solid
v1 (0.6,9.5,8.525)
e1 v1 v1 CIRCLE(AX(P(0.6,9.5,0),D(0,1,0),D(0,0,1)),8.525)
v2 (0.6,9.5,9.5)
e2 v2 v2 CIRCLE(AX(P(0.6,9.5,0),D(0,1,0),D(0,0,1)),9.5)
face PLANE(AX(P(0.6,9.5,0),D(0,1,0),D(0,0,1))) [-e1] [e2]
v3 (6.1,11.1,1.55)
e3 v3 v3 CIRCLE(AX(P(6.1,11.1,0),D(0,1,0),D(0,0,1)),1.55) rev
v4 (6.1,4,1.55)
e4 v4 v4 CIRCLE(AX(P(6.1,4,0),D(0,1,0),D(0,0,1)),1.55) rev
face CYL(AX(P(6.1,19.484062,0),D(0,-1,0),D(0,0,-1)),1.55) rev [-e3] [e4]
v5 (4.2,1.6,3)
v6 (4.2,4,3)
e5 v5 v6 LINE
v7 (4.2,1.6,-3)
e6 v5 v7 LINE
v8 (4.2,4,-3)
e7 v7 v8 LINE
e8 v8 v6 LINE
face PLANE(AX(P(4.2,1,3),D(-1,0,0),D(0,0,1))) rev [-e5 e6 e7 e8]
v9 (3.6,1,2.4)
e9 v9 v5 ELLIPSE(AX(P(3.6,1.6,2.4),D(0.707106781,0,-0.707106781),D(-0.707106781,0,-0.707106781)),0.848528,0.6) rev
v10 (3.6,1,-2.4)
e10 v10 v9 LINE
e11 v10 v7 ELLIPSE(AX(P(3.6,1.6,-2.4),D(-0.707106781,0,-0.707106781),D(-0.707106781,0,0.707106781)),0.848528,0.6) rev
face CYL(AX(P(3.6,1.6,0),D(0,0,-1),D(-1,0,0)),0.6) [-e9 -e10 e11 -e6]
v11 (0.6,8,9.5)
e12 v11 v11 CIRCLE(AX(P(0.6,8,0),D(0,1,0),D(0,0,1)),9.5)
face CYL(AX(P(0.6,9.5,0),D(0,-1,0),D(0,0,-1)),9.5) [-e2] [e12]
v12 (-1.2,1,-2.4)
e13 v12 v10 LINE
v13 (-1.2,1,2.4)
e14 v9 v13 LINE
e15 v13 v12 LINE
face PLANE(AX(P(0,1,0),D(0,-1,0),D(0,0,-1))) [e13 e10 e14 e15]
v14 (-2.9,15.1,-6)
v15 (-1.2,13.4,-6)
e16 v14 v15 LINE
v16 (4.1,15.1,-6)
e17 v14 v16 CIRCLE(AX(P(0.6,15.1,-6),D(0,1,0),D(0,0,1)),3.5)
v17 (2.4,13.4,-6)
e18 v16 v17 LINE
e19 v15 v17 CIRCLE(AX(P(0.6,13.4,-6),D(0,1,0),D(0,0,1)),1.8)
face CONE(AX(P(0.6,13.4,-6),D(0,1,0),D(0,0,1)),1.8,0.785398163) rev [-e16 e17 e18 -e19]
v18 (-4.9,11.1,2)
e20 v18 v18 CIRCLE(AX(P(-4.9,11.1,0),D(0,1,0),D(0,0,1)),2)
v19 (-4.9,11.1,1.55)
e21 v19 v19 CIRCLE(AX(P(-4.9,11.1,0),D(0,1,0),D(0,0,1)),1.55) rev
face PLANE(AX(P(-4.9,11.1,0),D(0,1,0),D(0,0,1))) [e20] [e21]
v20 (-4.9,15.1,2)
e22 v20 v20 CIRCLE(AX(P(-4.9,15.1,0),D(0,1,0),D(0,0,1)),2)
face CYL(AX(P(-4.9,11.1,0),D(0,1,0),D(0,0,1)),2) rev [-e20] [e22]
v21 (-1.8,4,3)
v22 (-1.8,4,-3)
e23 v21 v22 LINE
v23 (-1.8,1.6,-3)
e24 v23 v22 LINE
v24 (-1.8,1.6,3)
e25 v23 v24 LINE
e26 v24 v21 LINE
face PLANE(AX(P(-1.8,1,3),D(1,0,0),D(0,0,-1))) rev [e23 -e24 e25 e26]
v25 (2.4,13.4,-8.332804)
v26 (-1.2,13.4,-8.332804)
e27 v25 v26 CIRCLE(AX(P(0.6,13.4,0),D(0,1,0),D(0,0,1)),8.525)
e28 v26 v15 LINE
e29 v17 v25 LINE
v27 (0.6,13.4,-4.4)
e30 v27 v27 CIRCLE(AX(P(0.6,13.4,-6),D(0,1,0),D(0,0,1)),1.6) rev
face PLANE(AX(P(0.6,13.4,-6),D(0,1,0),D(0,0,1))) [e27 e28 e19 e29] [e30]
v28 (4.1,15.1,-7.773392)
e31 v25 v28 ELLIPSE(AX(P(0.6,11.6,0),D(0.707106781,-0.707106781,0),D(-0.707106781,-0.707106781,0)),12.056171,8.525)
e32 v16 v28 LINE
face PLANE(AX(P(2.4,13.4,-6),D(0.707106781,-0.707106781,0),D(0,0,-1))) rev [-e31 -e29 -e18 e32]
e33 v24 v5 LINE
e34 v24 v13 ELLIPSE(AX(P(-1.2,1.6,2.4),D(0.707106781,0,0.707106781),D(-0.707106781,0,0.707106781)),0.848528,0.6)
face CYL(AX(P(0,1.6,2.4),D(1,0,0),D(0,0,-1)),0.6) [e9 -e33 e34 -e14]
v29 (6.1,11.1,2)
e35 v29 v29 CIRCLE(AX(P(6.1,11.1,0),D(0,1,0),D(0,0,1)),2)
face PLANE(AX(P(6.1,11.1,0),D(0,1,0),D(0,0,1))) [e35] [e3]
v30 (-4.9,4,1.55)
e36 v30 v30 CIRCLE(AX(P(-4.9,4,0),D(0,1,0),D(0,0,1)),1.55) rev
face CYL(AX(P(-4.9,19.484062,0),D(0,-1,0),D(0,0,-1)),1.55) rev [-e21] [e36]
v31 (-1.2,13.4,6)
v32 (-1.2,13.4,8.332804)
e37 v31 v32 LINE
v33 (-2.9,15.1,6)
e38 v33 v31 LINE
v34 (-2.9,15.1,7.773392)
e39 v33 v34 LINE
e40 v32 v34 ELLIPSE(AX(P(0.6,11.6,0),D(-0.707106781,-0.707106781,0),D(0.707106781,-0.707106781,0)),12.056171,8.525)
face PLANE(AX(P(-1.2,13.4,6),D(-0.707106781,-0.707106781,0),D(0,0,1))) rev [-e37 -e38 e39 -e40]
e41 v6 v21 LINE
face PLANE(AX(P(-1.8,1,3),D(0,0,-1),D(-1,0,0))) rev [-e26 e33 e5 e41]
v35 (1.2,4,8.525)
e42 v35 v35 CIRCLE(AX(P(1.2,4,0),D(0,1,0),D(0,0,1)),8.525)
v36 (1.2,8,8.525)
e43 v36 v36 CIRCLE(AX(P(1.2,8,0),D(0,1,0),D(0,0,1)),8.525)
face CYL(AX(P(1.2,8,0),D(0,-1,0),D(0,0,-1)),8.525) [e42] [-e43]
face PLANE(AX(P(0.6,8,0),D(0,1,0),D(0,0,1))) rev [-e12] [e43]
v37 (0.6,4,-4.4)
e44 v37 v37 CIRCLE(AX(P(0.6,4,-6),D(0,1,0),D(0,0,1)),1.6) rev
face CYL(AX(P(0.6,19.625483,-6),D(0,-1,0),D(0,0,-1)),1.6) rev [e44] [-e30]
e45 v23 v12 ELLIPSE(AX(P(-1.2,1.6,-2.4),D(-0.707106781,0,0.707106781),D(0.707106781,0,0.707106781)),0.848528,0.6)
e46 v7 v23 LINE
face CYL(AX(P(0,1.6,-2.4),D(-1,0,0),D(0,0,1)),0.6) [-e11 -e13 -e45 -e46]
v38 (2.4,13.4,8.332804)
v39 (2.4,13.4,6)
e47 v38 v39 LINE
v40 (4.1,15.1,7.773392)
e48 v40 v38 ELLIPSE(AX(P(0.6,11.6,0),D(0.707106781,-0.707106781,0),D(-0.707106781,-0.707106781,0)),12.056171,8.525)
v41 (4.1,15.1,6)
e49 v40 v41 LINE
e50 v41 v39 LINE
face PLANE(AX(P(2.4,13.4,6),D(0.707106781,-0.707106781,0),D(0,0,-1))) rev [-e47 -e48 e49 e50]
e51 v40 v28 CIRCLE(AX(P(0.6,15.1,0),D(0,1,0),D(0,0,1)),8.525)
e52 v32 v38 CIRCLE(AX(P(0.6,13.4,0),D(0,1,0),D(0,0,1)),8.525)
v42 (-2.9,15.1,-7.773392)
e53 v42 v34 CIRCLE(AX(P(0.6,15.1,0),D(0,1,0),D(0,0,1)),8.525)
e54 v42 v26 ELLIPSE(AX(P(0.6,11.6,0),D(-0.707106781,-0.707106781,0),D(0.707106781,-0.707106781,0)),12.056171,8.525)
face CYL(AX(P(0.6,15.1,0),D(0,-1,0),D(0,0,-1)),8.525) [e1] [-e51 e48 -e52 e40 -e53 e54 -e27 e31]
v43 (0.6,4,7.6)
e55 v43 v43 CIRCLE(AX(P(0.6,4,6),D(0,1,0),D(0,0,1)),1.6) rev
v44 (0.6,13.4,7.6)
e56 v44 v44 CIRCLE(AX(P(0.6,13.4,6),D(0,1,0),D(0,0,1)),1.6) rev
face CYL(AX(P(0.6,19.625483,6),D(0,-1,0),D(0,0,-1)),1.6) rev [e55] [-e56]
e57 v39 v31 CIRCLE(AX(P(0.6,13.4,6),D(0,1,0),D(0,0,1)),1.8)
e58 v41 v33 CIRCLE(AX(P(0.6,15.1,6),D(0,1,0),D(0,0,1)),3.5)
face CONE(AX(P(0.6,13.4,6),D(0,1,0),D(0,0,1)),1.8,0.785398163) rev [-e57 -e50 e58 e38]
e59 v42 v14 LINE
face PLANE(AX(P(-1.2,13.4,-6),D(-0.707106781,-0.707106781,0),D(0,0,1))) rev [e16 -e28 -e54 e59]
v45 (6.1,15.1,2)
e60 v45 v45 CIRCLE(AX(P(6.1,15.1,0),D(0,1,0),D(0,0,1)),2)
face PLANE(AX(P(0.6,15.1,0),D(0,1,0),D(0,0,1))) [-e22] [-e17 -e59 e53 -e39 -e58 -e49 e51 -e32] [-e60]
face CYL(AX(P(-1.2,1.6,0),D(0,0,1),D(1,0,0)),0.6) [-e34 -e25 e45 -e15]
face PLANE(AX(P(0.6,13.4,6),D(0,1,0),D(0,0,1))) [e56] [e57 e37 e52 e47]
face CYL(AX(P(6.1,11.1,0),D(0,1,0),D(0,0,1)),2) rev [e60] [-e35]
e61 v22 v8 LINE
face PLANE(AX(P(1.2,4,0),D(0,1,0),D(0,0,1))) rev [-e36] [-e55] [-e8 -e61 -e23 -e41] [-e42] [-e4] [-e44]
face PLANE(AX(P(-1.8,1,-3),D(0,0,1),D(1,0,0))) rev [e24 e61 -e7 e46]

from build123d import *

# Parameters (mm, degrees)
SKETCH1_R            = 8.525
BOSS_EXTRUDE11_DEPTH = 4
SKETCH20_R           = 8.525
BOSS_EXTRUDE12_DEPTH = 4
SKETCH21_R           = 9.5
BOSS_EXTRUDE13_DEPTH = 1.5
SKETCH22_R           = 8.525
BOSS_EXTRUDE14_DEPTH = 5.6
BOSS_EXTRUDE15_START = 14.75
SKETCH30_R           = 8.525
BOSS_EXTRUDE15_DEPTH = 14.75
SKETCH33_R           = 2.1
CUT_EXTRUDE14_DEPTH  = 5.8
BOSS_EXTRUDE16_START = 1.25
SKETCH35_R           = 9.5
BOSS_EXTRUDE16_DEPTH = 1.25
SKETCH36_R           = 1.6
CUT_EXTRUDE15_DEPTH  = 29.85
CIRPATTERN1_COUNT    = 2
SKETCH43_R           = 1.55
CUT_EXTRUDE20_DEPTH  = 29.85
SKETCH44_R           = 2
CUT_EXTRUDE21_DEPTH  = 4
CUT_EXTRUDE22_DEPTH  = 1.7
CUT_EXTRUDE23_DEPTH  = 3
SKETCH47_W           = 28.870202412
SKETCH47_H           = 25.831233738
CUT_EXTRUDE24_DEPTH  = 18.75
SKETCH48_W           = 6
SKETCH48_H           = 6
BOSS_EXTRUDE17_DEPTH = 3
FILLET1_R            = 0.6
CHAMFER1_SIZE        = 1.7


with BuildPart() as part:
    # Sketch1 → Boss-Extrude11 (new body)
    with BuildSketch(Plane(origin=(0, 0, 0), x_dir=(1, 0, 0), z_dir=(0, 1, 0))):
        with Locations(Location((0, 0, 0), (0, 0, 270))):
            Circle(SKETCH1_R)
    extrude(amount=BOSS_EXTRUDE11_DEPTH)

    # Sketch20 → Boss-Extrude12 (add)
    with BuildSketch(Plane(origin=(0, 4, 0), x_dir=(1, 0, 0), z_dir=(0, 1, 0))):
        with Locations(Location((1.2, 0, 0), (0, 0, 94.035884191))):
            Circle(SKETCH20_R)
    extrude(amount=BOSS_EXTRUDE12_DEPTH)

    # Sketch21 → Boss-Extrude13 (add)
    with BuildSketch(Plane(origin=(0, 8, 0), x_dir=(1, 0, 0), z_dir=(0, 1, 0))):
        with Locations(Location((0.6, 0, 0), (0, 0, 270))):
            Circle(SKETCH21_R)
    extrude(amount=BOSS_EXTRUDE13_DEPTH)

    # Sketch22 → Boss-Extrude14 (add)
    with BuildSketch(Plane(origin=(0, 9.5, 0), x_dir=(1, 0, 0), z_dir=(0, 1, 0))):
        with Locations(Location((0.6, 0, 0), (0, 0, 270))):
            Circle(SKETCH22_R)
    extrude(amount=BOSS_EXTRUDE14_DEPTH)

    # Sketch30 → Boss-Extrude15 (add)
    with BuildSketch(Plane.XZ.offset(BOSS_EXTRUDE15_START)):
        with Locations(Location((0.6, 0, 0), (0, 0, 90))):
            Circle(SKETCH30_R)
    extrude(amount=-BOSS_EXTRUDE15_DEPTH)

    # Sketch33 → Cut-Extrude14 (cut)
    with BuildSketch(Plane.XZ.offset(14.75)):
        with Locations(Location((0.6, 0, 0), (0, 0, 270))):
            Circle(SKETCH33_R)
    extrude(amount=-CUT_EXTRUDE14_DEPTH, mode=Mode.SUBTRACT)

    # Sketch35 → Boss-Extrude16 (add)
    with BuildSketch(Plane.XZ.offset(BOSS_EXTRUDE16_START)):
        with Locations(Location((0.6, 0, 0), (0, 0, 90))):
            Circle(SKETCH35_R)
    extrude(amount=-BOSS_EXTRUDE16_DEPTH)

    # Sketch36 → Cut-Extrude15 (cut)
    with BuildSketch(Plane.XZ.offset(14.75)):
        with Locations(Location((0.6, 6, 0), (0, 0, 270))):
            Circle(SKETCH36_R)
    cut_extrude15 = extrude(amount=-CUT_EXTRUDE15_DEPTH, mode=Mode.SUBTRACT)

    # CirPattern1: Cut-Extrude15 ×2 about axis
    cirpattern1_axis = Axis((0.6, 0, 0), (0, 1, 0))
    for i in range(1, CIRPATTERN1_COUNT):
        add(cut_extrude15.rotate(cirpattern1_axis, i * 360 / CIRPATTERN1_COUNT), mode=Mode.SUBTRACT)

    # Sketch43 → Cut-Extrude20 (cut)
    with BuildSketch(Plane.XZ.offset(14.75)):
        with Locations(Location((-4.9, 0, 0), (0, 0, 270))):
            Circle(SKETCH43_R)
        with Locations(Location((6.1, 0, 0), (0, 0, 270))):
            Circle(SKETCH43_R)
    extrude(amount=-CUT_EXTRUDE20_DEPTH, mode=Mode.SUBTRACT)

    # Sketch44 → Cut-Extrude21 (cut)
    with BuildSketch(Plane(origin=(0, 15.1, 0), x_dir=(1, 0, 0), z_dir=(0, 1, 0))):
        with Locations(Location((-4.9, 0, 0), (0, 0, 270))):
            Circle(SKETCH44_R)
        with Locations(Location((6.1, 0, 0), (0, 0, 270))):
            Circle(SKETCH44_R)
    extrude(amount=-CUT_EXTRUDE21_DEPTH, mode=Mode.SUBTRACT)

    # Sketch45 → Cut-Extrude22 (cut)
    with BuildSketch(Plane(origin=(0, 15.1, 0), x_dir=(1, 0, 0), z_dir=(0, 1, 0))):
        with BuildLine():
            Line((-2.9, -6), (-2.9, -10.872564071))
            Line((-2.9, -10.872564071), (4.1, -10.872564071))
            Line((4.1, -10.872564071), (4.1, -6))
            ThreePointArc((4.1, -6), (0.6, -2.5), (-2.9, -6))
        make_face()
        with BuildLine():
            Line((-2.9, 6), (-2.9, 11.42214608))
            Line((-2.9, 11.42214608), (4.1, 11.42214608))
            Line((4.1, 11.42214608), (4.1, 6))
            ThreePointArc((4.1, 6), (0.6, 2.5), (-2.9, 6))
        make_face()
    extrude(amount=-CUT_EXTRUDE22_DEPTH, mode=Mode.SUBTRACT)

    # Sketch46 → Cut-Extrude23 (cut)
    with BuildSketch(Plane.XZ.offset(14.75)):
        with BuildLine():
            Line((-4.9, 3), (-9.719928829, 3))
            Line((-9.719928829, 3), (-9.719928829, -3))
            Line((-9.719928829, -3), (-4.9, -3))
            ThreePointArc((-4.9, -3), (-1.9, 0), (-4.9, 3))
        make_face()
        with BuildLine():
            Line((6.1, 3), (10.889396495, 3))
            Line((10.889396495, 3), (10.889396495, -3))
            Line((10.889396495, -3), (6.1, -3))
            ThreePointArc((6.1, -3), (3.1, 0), (6.1, 3))
        make_face()
    extrude(amount=-CUT_EXTRUDE23_DEPTH, mode=Mode.SUBTRACT)

    # Sketch47 → Cut-Extrude24 (cut)
    with BuildSketch(Plane.XZ.offset(14.75)):
        with Locations((1.011527008, 0.205763504)):
            Rectangle(SKETCH47_W, SKETCH47_H)
    extrude(amount=-CUT_EXTRUDE24_DEPTH, mode=Mode.SUBTRACT)

    # Sketch48 → Boss-Extrude17 (add)
    with BuildSketch(Plane.XZ.offset(-4)):
        with Locations((1.2, 0)):
            Rectangle(SKETCH48_W, SKETCH48_H)
    extrude(amount=BOSS_EXTRUDE17_DEPTH)

    # Fillet1
    fillet1_edges = [part.edges().sort_by_distance(p)[0] for p in [
        (-1.8, 1, 0),
        (1.2, 1, -3),
        (4.2, 1, 0),
        (1.2, 1, 3),
    ]]
    fillet(fillet1_edges, radius=FILLET1_R)

    # Chamfer1
    chamfer1_edges = [part.edges().sort_by_distance(p)[0] for p in [
        (4.1, 13.4, 6.886696058),
        (-2.9, 13.4, 6.886696058),
        (-2.9, 13.4, -6.886696058),
        (4.1, 13.4, -6.886696058),
        (0.6, 13.4, 2.5),
        (0.6, 13.4, -2.5),
    ]]
    chamfer(chamfer1_edges, length=CHAMFER1_SIZE - 0.0001)  # a hair under: the kernel refuses the full size


solid = part.part
